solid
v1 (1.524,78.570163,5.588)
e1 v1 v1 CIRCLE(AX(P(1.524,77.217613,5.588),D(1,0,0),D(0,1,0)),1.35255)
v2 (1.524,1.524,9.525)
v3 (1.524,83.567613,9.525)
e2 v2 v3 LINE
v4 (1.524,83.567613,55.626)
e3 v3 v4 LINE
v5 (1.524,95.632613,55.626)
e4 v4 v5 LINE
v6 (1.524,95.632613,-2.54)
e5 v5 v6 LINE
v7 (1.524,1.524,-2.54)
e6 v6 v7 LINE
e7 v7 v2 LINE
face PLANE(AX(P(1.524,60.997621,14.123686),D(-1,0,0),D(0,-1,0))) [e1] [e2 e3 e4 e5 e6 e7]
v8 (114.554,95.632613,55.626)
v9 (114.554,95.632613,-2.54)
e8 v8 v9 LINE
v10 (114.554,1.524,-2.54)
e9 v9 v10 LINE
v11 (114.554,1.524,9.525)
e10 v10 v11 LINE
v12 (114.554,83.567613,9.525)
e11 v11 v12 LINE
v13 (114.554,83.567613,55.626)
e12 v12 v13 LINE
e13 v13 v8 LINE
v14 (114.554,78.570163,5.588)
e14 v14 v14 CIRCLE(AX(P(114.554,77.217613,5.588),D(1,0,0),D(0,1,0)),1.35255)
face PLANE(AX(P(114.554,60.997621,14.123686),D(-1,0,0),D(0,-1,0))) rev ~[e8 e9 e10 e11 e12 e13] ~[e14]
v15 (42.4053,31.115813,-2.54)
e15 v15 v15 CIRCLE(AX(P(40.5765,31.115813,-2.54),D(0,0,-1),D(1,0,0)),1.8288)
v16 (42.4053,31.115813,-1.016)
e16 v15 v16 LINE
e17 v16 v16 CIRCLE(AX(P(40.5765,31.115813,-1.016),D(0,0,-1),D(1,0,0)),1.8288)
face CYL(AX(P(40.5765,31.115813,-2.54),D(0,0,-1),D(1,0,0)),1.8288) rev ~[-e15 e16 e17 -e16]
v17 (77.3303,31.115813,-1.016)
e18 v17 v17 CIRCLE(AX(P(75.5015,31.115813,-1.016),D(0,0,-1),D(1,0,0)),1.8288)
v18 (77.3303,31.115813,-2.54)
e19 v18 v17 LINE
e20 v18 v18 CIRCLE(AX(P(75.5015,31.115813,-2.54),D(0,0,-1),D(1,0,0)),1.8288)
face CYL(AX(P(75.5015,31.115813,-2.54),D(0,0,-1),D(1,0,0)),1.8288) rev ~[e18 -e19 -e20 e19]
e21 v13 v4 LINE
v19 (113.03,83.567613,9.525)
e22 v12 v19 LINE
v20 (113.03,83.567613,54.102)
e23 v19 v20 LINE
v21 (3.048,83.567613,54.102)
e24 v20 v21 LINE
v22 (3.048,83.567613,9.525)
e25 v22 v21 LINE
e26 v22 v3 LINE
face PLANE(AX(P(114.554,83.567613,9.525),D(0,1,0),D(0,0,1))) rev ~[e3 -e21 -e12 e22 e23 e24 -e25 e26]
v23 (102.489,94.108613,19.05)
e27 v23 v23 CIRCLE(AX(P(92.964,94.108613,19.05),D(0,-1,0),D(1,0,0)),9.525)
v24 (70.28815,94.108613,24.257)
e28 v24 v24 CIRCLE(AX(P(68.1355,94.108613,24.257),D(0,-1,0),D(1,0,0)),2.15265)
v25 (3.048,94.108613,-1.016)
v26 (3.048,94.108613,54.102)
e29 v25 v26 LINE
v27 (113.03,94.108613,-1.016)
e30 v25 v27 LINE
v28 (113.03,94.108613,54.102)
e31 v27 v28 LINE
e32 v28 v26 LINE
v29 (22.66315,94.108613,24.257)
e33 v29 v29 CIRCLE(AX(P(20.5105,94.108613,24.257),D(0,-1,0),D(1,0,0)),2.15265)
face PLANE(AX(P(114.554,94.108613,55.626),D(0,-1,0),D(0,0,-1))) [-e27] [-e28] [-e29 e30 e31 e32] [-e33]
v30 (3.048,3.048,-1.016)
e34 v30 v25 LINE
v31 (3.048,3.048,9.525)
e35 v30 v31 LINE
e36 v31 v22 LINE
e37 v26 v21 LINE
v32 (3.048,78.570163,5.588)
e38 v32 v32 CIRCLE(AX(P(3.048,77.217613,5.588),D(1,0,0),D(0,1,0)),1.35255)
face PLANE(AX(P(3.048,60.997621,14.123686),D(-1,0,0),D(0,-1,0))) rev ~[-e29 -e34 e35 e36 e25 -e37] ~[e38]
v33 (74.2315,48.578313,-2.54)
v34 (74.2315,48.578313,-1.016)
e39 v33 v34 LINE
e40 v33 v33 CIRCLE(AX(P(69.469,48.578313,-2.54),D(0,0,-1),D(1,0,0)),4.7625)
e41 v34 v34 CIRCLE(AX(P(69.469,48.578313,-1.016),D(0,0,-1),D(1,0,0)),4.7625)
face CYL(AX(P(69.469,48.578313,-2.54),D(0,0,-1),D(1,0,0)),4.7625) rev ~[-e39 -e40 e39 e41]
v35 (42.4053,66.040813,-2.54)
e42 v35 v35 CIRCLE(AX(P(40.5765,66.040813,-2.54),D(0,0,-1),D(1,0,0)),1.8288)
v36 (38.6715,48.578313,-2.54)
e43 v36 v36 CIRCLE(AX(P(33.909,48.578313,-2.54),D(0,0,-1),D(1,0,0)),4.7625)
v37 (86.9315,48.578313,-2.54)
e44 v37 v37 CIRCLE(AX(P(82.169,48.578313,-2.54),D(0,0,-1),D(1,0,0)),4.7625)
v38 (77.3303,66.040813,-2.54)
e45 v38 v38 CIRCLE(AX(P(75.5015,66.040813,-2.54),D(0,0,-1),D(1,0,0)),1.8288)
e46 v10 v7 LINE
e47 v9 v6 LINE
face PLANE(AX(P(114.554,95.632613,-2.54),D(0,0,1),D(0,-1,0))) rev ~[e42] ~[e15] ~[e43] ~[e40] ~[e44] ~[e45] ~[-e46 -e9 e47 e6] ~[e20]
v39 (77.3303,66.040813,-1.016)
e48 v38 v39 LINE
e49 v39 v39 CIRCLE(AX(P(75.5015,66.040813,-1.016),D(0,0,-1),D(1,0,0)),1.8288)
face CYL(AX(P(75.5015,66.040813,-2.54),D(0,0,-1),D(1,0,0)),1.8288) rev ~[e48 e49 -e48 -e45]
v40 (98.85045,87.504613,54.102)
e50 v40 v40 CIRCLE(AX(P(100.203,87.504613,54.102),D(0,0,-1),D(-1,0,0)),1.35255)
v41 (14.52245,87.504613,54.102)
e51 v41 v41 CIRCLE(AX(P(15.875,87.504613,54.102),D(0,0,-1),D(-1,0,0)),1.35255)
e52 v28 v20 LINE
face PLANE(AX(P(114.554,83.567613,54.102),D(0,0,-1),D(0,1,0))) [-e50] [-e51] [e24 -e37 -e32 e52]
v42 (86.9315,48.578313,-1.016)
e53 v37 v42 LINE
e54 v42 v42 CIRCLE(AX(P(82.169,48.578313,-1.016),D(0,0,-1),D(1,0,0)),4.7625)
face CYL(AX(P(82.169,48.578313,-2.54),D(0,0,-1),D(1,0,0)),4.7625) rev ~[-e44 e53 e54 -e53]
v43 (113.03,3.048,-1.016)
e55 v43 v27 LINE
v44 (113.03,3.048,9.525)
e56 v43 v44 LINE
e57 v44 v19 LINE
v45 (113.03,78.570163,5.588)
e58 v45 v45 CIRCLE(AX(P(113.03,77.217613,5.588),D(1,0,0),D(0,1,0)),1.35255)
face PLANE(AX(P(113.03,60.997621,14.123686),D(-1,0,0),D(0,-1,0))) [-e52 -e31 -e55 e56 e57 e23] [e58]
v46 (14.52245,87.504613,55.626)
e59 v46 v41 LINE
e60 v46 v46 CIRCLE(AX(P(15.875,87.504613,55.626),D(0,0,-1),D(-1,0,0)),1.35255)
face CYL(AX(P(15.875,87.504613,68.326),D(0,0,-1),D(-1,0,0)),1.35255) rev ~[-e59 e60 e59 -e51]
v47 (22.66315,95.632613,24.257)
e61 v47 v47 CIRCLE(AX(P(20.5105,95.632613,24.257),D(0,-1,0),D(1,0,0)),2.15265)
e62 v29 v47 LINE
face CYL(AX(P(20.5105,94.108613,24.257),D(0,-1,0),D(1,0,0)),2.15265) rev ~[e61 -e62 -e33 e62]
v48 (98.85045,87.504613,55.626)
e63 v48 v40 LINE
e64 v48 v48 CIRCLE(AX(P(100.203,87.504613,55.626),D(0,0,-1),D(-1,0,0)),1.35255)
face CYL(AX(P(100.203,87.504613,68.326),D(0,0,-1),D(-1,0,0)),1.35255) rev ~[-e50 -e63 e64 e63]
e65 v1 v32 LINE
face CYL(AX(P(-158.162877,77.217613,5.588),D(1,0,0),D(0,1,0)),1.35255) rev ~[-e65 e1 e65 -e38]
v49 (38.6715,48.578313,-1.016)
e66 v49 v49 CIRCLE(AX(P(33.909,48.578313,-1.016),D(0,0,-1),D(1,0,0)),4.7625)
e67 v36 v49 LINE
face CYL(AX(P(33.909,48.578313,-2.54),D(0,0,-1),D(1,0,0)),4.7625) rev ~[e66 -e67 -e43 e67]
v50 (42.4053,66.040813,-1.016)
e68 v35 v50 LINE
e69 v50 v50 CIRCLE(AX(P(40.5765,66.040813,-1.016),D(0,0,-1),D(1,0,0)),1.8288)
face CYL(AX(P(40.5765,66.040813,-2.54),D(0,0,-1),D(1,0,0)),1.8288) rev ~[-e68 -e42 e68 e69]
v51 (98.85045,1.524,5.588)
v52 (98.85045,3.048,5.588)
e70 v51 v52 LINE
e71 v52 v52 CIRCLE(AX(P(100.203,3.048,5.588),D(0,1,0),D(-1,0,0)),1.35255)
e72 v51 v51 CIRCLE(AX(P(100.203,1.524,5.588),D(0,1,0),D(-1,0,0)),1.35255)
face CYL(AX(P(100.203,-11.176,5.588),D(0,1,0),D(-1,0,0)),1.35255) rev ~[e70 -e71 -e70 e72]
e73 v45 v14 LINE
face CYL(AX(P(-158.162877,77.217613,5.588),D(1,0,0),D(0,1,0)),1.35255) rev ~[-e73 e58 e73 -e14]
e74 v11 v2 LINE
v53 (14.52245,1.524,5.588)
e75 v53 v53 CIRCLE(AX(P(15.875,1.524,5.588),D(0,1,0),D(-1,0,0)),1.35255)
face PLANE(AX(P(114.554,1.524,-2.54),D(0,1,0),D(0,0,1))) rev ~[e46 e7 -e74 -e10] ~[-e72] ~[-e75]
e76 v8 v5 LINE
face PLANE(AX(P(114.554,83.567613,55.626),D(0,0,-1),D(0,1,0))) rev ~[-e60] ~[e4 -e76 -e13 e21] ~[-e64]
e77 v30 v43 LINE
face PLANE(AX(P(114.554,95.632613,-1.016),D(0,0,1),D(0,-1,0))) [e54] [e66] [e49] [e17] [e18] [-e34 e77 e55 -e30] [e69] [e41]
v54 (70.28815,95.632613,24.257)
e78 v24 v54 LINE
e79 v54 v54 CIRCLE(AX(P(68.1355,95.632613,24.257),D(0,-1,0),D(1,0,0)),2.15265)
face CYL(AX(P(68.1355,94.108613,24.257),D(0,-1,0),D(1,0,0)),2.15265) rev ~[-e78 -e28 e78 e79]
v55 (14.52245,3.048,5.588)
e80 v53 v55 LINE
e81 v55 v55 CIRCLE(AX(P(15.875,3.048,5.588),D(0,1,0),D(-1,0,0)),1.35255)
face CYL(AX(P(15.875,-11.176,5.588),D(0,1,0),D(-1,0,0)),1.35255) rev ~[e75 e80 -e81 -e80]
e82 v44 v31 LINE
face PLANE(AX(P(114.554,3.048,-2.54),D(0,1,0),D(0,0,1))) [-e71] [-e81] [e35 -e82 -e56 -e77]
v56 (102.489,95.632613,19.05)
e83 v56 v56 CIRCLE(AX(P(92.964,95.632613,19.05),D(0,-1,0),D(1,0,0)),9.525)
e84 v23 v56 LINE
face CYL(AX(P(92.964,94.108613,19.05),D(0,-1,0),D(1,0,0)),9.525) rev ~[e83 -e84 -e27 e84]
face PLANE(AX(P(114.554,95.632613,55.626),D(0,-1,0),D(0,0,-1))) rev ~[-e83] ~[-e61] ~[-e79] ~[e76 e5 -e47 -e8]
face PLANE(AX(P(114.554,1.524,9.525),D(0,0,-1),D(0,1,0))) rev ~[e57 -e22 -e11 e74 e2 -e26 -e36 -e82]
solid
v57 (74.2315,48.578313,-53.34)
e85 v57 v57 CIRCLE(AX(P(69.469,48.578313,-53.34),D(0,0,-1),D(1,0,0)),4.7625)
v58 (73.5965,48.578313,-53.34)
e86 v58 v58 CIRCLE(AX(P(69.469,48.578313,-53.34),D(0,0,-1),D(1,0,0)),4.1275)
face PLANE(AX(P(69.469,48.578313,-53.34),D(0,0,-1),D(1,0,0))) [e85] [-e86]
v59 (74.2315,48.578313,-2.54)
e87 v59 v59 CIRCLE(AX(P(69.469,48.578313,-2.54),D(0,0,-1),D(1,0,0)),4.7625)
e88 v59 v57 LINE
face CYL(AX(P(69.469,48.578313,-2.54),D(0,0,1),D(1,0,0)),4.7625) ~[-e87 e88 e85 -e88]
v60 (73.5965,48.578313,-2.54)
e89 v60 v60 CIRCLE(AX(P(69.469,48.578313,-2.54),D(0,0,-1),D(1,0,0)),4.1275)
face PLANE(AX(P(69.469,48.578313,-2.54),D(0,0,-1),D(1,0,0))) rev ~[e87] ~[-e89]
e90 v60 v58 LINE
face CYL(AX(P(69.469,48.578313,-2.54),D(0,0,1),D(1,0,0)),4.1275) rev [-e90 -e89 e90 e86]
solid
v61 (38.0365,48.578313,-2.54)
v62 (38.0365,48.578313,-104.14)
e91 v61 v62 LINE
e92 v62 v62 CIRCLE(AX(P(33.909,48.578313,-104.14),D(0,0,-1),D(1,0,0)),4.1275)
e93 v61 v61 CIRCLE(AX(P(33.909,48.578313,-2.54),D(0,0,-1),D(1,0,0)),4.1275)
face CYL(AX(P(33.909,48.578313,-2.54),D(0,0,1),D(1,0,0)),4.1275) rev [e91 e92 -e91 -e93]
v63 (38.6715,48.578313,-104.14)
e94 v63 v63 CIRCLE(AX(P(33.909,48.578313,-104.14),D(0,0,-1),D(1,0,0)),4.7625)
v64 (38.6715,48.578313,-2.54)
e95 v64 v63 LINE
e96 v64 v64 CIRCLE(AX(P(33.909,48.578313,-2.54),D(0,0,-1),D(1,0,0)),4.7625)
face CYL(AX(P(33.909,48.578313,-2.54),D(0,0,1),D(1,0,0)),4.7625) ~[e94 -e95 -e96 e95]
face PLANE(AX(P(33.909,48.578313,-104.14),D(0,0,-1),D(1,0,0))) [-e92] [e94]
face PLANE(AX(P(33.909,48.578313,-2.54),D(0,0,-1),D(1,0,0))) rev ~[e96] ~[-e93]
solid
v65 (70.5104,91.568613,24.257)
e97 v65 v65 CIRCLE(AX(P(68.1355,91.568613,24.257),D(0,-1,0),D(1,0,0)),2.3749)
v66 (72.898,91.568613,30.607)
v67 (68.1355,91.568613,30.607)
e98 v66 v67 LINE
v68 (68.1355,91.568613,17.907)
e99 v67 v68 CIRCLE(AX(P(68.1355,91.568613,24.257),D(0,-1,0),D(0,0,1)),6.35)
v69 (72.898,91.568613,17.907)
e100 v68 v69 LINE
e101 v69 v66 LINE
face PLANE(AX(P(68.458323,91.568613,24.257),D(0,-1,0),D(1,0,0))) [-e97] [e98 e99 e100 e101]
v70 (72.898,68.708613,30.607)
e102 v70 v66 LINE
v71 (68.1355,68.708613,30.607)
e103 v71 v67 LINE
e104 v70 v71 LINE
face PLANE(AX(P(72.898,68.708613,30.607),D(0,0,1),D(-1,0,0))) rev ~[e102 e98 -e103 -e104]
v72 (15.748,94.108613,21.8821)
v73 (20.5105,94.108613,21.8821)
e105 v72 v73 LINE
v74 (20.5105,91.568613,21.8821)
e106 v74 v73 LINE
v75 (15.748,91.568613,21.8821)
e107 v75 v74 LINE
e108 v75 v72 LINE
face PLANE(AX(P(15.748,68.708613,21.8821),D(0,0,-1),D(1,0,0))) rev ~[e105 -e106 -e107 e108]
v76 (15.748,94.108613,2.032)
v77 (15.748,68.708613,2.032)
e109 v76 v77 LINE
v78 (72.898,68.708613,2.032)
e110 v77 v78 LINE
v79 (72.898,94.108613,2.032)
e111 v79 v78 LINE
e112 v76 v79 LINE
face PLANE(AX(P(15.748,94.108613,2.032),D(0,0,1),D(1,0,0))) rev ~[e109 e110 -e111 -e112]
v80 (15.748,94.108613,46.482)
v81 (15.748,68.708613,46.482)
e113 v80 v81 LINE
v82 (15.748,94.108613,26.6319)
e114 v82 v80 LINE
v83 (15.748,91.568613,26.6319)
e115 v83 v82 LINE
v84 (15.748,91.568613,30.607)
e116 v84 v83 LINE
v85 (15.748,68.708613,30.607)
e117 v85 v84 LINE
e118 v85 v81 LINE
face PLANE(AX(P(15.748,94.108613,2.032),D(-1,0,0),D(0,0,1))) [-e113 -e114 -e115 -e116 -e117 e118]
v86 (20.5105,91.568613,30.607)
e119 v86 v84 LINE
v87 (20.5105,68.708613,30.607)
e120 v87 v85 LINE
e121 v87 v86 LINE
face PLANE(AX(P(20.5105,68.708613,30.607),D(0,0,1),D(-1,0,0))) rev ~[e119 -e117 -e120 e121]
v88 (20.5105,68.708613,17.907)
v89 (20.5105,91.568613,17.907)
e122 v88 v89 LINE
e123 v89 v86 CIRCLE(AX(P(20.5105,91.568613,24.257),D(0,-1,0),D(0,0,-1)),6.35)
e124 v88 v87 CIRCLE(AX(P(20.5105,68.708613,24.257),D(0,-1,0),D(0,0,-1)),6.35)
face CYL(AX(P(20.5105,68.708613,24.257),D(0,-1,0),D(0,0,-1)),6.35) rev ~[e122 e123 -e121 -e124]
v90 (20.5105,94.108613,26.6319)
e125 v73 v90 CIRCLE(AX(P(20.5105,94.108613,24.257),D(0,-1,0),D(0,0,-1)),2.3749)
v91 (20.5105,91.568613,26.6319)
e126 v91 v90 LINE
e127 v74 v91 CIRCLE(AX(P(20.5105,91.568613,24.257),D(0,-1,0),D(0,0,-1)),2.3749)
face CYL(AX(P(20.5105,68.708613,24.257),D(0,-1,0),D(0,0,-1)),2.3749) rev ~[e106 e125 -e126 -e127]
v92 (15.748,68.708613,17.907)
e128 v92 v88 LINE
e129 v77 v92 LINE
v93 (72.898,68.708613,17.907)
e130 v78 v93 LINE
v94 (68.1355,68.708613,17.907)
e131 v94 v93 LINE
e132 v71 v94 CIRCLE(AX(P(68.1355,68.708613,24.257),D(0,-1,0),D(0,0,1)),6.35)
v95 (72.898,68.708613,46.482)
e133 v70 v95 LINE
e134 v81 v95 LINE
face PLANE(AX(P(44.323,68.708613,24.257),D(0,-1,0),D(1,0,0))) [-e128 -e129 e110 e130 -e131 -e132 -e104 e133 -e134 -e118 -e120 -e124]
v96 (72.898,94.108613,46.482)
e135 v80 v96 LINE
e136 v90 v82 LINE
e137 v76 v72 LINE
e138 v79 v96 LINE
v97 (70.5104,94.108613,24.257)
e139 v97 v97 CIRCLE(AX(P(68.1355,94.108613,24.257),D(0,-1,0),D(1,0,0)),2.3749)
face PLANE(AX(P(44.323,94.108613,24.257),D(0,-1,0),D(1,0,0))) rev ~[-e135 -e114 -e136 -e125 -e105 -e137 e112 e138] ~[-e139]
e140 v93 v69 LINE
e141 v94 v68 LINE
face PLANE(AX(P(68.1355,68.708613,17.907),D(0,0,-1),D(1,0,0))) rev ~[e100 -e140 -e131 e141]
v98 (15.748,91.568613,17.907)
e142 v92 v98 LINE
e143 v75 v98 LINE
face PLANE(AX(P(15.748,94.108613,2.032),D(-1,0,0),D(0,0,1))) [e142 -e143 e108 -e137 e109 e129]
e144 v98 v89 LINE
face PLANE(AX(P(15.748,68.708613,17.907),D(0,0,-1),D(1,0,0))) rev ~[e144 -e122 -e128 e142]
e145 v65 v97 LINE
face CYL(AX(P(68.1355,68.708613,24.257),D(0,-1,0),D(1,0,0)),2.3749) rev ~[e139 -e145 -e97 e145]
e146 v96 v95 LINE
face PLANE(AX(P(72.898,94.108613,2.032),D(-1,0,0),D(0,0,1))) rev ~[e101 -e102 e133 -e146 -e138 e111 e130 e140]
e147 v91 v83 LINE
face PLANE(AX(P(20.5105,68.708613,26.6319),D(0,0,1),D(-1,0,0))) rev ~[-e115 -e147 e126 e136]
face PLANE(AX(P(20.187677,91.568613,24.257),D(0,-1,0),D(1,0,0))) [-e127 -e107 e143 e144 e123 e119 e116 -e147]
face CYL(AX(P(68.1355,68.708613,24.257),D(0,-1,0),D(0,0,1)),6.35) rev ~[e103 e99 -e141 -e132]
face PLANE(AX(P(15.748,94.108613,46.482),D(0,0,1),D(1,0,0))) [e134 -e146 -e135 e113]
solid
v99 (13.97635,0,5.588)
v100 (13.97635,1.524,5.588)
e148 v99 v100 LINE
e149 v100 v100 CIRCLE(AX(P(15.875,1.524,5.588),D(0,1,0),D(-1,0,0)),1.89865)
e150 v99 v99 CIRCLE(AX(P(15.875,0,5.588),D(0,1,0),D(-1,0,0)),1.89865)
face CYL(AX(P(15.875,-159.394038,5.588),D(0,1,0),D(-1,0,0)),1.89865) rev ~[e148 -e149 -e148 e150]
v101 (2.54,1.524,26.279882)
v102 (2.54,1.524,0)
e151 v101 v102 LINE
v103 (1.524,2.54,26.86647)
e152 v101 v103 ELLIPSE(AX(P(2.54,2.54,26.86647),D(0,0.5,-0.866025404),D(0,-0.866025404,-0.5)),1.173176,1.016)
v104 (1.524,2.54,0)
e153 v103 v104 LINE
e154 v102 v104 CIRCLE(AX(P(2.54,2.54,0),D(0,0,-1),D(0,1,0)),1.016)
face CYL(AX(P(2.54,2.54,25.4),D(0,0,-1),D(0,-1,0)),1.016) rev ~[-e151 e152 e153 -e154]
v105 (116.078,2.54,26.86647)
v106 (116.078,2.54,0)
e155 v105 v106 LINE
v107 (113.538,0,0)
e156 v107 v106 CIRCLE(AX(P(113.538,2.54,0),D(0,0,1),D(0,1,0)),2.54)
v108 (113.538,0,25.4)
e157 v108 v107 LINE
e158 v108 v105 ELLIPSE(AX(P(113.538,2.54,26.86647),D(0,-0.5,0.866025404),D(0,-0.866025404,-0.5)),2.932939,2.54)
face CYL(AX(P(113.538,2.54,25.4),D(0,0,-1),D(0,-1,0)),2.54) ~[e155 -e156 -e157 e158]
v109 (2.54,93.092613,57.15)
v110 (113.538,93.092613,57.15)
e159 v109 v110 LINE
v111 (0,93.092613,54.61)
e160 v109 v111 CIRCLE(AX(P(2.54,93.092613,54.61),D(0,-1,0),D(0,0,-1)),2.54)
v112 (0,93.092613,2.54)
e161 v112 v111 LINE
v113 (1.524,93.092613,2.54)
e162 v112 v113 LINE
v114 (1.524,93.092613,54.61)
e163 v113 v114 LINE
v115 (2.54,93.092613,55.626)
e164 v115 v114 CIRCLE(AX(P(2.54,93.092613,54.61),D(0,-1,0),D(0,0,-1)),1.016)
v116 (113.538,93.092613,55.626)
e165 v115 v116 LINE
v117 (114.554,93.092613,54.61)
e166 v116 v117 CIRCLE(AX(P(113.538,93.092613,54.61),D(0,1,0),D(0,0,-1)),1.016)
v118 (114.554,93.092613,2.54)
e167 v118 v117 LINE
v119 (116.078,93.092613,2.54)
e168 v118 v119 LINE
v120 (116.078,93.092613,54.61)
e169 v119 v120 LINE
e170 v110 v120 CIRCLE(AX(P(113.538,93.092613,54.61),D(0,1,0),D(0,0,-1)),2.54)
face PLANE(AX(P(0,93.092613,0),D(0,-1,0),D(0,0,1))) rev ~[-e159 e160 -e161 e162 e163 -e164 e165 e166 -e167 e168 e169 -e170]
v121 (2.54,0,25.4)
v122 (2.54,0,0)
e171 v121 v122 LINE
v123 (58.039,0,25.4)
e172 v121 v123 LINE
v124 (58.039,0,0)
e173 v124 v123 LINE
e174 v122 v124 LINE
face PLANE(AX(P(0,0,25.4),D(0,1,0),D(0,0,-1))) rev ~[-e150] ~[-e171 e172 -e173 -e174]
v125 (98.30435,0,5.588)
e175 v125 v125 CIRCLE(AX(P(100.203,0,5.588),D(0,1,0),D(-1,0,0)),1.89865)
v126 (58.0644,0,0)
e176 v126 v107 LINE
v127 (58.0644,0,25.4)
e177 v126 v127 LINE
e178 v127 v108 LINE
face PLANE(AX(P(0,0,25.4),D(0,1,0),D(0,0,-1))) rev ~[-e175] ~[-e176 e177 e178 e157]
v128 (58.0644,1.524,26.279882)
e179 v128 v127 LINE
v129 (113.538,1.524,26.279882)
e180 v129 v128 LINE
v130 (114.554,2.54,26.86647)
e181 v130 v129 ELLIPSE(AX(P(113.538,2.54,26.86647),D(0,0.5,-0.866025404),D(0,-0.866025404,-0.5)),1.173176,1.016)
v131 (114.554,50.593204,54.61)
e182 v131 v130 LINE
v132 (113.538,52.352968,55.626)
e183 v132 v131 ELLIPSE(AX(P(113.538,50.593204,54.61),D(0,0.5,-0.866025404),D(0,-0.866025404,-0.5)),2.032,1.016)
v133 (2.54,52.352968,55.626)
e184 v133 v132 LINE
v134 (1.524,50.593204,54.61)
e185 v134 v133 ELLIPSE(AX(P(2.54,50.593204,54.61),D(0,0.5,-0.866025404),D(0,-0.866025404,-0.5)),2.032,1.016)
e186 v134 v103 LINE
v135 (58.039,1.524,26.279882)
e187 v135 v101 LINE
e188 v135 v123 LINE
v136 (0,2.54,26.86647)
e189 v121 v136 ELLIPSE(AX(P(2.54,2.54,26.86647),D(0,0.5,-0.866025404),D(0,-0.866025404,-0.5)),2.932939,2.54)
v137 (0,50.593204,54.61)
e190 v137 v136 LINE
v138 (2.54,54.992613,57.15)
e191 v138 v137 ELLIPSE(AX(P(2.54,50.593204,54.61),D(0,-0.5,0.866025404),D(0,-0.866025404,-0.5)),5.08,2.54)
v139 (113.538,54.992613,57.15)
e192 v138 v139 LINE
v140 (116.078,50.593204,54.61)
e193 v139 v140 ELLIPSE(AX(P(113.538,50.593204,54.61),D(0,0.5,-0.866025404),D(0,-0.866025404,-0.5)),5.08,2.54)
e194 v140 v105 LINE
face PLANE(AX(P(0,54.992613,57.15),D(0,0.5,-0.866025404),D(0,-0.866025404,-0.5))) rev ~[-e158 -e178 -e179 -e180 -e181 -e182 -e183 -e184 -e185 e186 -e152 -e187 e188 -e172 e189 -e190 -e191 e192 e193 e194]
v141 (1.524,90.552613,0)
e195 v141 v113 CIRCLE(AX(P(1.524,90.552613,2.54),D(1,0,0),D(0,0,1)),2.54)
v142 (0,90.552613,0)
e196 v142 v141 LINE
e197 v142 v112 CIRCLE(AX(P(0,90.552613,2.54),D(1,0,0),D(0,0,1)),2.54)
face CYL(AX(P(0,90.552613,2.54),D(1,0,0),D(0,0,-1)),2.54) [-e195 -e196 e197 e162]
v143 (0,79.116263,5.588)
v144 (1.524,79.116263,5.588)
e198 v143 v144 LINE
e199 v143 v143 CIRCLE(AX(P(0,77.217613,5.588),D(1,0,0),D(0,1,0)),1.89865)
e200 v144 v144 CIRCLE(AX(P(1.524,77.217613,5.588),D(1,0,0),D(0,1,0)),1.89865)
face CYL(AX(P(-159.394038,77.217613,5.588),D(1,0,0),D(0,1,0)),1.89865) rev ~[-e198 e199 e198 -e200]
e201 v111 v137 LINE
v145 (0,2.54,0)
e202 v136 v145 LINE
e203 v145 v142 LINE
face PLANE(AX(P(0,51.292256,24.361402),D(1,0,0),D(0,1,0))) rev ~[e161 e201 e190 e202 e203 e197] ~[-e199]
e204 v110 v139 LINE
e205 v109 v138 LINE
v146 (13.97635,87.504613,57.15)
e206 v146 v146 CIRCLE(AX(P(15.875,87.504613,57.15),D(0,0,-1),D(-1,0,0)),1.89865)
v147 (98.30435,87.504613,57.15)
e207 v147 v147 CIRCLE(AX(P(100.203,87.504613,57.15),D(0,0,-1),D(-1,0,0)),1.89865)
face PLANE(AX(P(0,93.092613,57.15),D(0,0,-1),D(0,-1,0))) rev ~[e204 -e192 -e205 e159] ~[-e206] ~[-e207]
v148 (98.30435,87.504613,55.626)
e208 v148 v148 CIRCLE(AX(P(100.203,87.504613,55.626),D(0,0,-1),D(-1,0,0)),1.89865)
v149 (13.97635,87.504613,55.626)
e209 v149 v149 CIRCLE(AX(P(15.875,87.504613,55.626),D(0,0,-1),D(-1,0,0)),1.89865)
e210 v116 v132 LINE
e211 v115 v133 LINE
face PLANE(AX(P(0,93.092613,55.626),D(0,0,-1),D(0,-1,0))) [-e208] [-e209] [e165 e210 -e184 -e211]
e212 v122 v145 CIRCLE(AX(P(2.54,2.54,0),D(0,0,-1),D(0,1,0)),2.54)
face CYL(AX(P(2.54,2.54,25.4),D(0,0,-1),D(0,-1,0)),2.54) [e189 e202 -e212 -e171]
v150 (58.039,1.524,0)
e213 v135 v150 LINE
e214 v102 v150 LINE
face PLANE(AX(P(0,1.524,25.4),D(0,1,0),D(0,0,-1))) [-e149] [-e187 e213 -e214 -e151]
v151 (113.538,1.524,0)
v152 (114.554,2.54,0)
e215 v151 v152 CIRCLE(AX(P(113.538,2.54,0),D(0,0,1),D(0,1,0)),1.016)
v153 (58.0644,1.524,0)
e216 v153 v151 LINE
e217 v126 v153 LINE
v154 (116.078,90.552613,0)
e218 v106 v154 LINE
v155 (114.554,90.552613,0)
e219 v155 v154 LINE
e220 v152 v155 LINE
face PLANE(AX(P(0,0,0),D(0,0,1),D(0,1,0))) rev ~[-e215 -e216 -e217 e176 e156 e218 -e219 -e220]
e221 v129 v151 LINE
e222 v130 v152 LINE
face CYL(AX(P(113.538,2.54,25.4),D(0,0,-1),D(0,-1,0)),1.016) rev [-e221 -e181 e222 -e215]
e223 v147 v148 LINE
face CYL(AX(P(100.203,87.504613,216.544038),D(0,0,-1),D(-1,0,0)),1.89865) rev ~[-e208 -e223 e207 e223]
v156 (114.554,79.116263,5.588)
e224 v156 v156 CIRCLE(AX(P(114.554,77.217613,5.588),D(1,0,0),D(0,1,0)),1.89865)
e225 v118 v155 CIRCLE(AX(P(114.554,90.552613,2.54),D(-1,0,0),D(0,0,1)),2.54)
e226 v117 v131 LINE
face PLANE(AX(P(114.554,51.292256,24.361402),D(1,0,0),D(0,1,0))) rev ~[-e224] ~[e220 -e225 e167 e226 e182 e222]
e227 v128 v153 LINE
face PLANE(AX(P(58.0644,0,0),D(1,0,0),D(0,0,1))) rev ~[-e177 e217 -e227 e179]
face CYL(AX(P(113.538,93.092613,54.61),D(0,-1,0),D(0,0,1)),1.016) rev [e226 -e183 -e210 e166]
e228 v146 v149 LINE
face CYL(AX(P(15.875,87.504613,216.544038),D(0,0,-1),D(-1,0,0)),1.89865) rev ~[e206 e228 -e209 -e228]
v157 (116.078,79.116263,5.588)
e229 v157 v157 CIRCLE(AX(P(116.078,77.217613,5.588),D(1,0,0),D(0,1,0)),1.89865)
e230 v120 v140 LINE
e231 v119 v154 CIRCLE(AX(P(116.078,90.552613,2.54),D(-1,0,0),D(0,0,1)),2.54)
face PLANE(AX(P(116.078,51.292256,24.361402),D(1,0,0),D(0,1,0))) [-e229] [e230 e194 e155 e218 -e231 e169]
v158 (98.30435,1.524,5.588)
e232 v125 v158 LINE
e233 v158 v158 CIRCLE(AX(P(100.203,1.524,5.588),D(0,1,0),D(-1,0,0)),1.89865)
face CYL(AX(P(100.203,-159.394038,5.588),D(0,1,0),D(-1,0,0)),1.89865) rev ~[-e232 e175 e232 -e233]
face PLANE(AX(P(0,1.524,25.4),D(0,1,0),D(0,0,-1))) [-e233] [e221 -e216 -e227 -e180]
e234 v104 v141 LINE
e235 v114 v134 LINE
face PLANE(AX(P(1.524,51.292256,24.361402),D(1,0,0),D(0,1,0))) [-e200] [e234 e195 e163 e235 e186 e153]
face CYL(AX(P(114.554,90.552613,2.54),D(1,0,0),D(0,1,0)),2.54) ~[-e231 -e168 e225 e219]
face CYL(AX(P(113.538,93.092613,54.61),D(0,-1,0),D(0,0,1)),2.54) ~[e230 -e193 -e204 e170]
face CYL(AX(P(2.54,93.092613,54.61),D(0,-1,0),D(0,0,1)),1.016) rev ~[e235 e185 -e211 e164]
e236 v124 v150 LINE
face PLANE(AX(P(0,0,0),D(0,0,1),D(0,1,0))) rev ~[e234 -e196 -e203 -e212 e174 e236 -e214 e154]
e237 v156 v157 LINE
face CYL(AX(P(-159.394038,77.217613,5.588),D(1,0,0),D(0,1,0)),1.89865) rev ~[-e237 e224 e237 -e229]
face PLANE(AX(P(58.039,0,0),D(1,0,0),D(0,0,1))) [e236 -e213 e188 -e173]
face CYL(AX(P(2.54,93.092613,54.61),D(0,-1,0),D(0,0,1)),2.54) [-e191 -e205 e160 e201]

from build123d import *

# Parameters (mm, degrees)
F1_DEPTH         = 116.078
F2_R             = 2.54
F3_T             = -1.524
F5_DEPTH         = 113.03
F6_T             = -1.524
F7_W             = 57.15
F7_H             = 44.45
F8_DEPTH         = 25.4
F10_DEPTH        = 22.86
F11_R            = 2.3749
F12_DEPTH        = 26.925
F13_R            = 4.7625
F14_DEPTH        = 1.524
F15_R            = 4.7625
F15_R_2          = 4.1275
F16_DEPTH        = 50.8
F17_DEPTH        = 101.6
F18_R            = 1.8288
F19_DEPTH        = 59.691
F20_R            = 2.15265
F21_DEPTH        = 1.525
F22_R            = 9.525
F23_DEPTH        = 1.525
F27_D            = 3.7973
F27_ON_F25_D     = 3.7973
F27_ON_F24_D     = 3.7973
F28_D            = 2.7051
F29_D            = 2.7051
F29_DEPTH        = 12.7
F29_START        = 1.524
F29_TIP          = 0.8126940303
F29_ON_F25_D     = 2.7051
F29_ON_F25_DEPTH = 12.7
F29_ON_F25_START = 1.524
F29_ON_F25_TIP   = 0.8126940303
F30_W            = 0.0254
F30_H            = 69.686152041
F31_DEPTH        = 25.4
F32_R            = 2.54


with BuildPart() as f1:
    # F0 (on Right) → F1 (new body)
    with BuildSketch(Plane.YZ):
        Polygon((0, 25.4), (0, 0), (93.0926131403, 0), (93.0926131403, 57.15), (54.9926131403, 57.15), align=None)
    extrude(amount=F1_DEPTH)

    # F2
    f2_edges = [f1.edges().sort_by_distance(p)[0] for p in [
        (116.078, 74.042613, 57.15),
        (116.078, 0, 12.7),
        (0, 0, 12.7),
        (0, 74.042613, 57.15),
    ]]
    fillet(f2_edges, radius=F2_R)

    # F3
    f3_openings = [f1.faces().sort_by_distance(p)[0] for p in [
        (58.039, 93.092613, 28.563304),
        (58.039, 46.558092, 0),
        (58.039, 27.488057, 41.270237),
    ]]
    offset(amount=F3_T, openings=f3_openings)

    # F27 (through all)
    with Locations(Plane.XY.offset(57.15)):
        with Locations((100.203, 87.5046131403), (15.875, 87.5046131403)):
            Hole(F27_D / 2)

    # F27 on F25 (through all)
    with Locations(Plane.XZ):
        with Locations((15.875, 5.588), (100.203, 5.588)):
            Hole(F27_ON_F25_D / 2)

    # F27 on F24 (through all)
    with Locations(Plane(origin=(0, 0, 0), x_dir=(0, -1, 0), z_dir=(-1, 0, 0))):
        with Locations((-77.2176131403, 5.588)):
            Hole(F27_ON_F24_D / 2)

    # F30 (on face) → F31 (cut)
    with BuildSketch(Plane.XZ):
        with Locations((58.0517, 34.8430760205)):
            Rectangle(F30_W, F30_H)
    extrude(amount=-F31_DEPTH, mode=Mode.SUBTRACT)

    # F32
    f32_edges = [f1.edges().sort_by_distance(p)[0] for p in [
        (0.762, 93.092613, 0),
        (115.316, 93.092613, 0),
    ]]
    fillet(f32_edges, radius=F32_R)


with BuildPart() as f5:
    # F4 (on face) → F5 (new body, through all)
    with BuildSketch(Plane(origin=(114.554, 0, 0), x_dir=(0, -1, 0), z_dir=(-1, 0, 0))):
        Polygon((-1.524, 9.525), (-83.5676131403, 9.525), (-83.5676131403, 55.626), (-93.0926131403, 55.626), (-95.6326131403, 55.626), (-95.6326131403, -2.54), (-1.524, -2.54), (-1.524, 0), align=None)
    extrude(amount=F5_DEPTH)

    # F6
    f6_openings = [f5.faces().sort_by_distance(p)[0] for p in [
        (58.039, 83.567613, 32.5755),
        (58.039, 42.545807, 9.525),
    ]]
    offset(amount=F6_T, openings=f6_openings)

    # F13 (on face) → F14 (cut, through all)
    with BuildSketch(Plane(origin=(0, 0, -2.54), x_dir=(1, 0, 0), z_dir=(0, 0, -1))):
        with Locations((82.169, -48.5783125154)):
            Circle(F13_R)
        with Locations((69.469, -48.5783125154)):
            Circle(F13_R)
        with Locations((33.909, -48.5783125154)):
            Circle(F13_R)
    extrude(amount=-F14_DEPTH, mode=Mode.SUBTRACT)

    # F18 (on face) → F19 (cut, through all)
    with BuildSketch(Plane(origin=(0, 0, -2.54), x_dir=(1, 0, 0), z_dir=(0, 0, -1))):
        with Locations((40.5765, -31.1158125154)):
            Circle(F18_R)
        with Locations((75.5015, -31.1158125154)):
            Circle(F18_R)
        with Locations((75.5015, -66.0408125154)):
            Circle(F18_R)
        with Locations((40.5765, -66.0408125154)):
            Circle(F18_R)
    extrude(amount=-F19_DEPTH, mode=Mode.SUBTRACT)

    # F20 (on face) → F21 (cut, through all)
    with BuildSketch(Plane.XZ.offset(-94.1086131403)):
        with Locations((20.5105, 24.257)):
            Circle(F20_R)
        with Locations((68.1355, 24.257)):
            Circle(F20_R)
    extrude(amount=-F21_DEPTH, mode=Mode.SUBTRACT)

    # F22 (on face) → F23 (cut, through all)
    with BuildSketch(Plane.XZ.offset(-94.1086131403)):
        with Locations((92.964, 19.05)):
            Circle(F22_R)
    extrude(amount=-F23_DEPTH, mode=Mode.SUBTRACT)

    # F28 (through all)
    with Locations(Plane(origin=(0, 0, 0), x_dir=(0, -1, 0), z_dir=(-1, 0, 0))):
        with Locations((-77.2176131403, 5.588)):
            Hole(F28_D / 2)

    # F29
    # its depths count from where the whole tool has entered the part; down to there all is cleared
    with Locations(Plane.XY.offset(57.15).offset(-F29_START)):
        with Locations((15.875, 87.5046131403), (100.203, 87.5046131403)):
            Hole(F29_D / 2, depth=F29_DEPTH)
            with Locations((0, 0, -(F29_DEPTH + F29_TIP / 2))):  # 118° drill point
                Cone(0, F29_D / 2, F29_TIP, mode=Mode.SUBTRACT)

    # F29 on F25
    # its depths count from where the whole tool has entered the part; down to there all is cleared
    with Locations(Plane.XZ.offset(-F29_ON_F25_START)):
        with Locations((100.203, 5.588), (15.875, 5.588)):
            Hole(F29_ON_F25_D / 2, depth=F29_ON_F25_DEPTH)
            with Locations((0, 0, -(F29_ON_F25_DEPTH + F29_ON_F25_TIP / 2))):  # 118° drill point
                Cone(0, F29_ON_F25_D / 2, F29_ON_F25_TIP, mode=Mode.SUBTRACT)


with BuildPart() as f8:
    # F7 (on face) → F8 (new body)
    with BuildSketch(Plane.XZ.offset(-94.1086131403)):
        with Locations((44.323, 24.257)):
            Rectangle(F7_W, F7_H)
    extrude(amount=F8_DEPTH)

    # F9 (on face) → F10 (cut)
    with BuildSketch(Plane.XZ.offset(-68.7086131403)):
        with BuildLine():
            Line((72.898, 30.607), (68.1355, 30.607))
            ThreePointArc((68.1355, 30.607), (61.7855, 24.257), (68.1355, 17.907))
            Line((68.1355, 17.907), (72.898, 17.907))
            Line((72.898, 17.907), (72.898, 30.607))
        make_face()
        with BuildLine():
            ThreePointArc((20.5105, 17.907), (26.8605, 24.257), (20.5105, 30.607))
            Line((20.5105, 30.607), (15.748, 30.607))
            Line((15.748, 30.607), (15.748, 17.907))
            Line((15.748, 17.907), (20.5105, 17.907))
        make_face()
    extrude(amount=-F10_DEPTH, mode=Mode.SUBTRACT)

    # F11 (on face) → F12 (cut, through all)
    with BuildSketch(Plane.XZ.offset(-68.7086131403)):
        with BuildLine():
            Line((15.748, 21.8821), (20.5105, 21.8821))
            ThreePointArc((20.5105, 21.8821), (22.8854, 24.257), (20.5105, 26.6319))
            Line((20.5105, 26.6319), (15.748, 26.6319))
            Line((15.748, 26.6319), (15.748, 21.8821))
        make_face()
        with Locations((68.1355, 24.257)):
            Circle(F11_R)
    extrude(amount=-F12_DEPTH, mode=Mode.SUBTRACT)


with BuildPart() as f16:
    # F15 (on face) → F16 (new body)
    with BuildSketch(Plane(origin=(0, 0, -2.54), x_dir=(1, 0, 0), z_dir=(0, 0, -1))):
        with Locations((69.469, -48.5783125154)):
            Circle(F15_R)
        with Locations((69.469, -48.5783125154)):
            Circle(F15_R_2, mode=Mode.SUBTRACT)
    extrude(amount=F16_DEPTH)


with BuildPart() as f17:
    # F15 (on face) → F17 (new body)
    with BuildSketch(Plane(origin=(0, 0, -2.54), x_dir=(1, 0, 0), z_dir=(0, 0, -1))):
        with Locations((33.909, -48.5783125154)):
            Circle(F15_R)
        with Locations((33.909, -48.5783125154)):
            Circle(F15_R_2, mode=Mode.SUBTRACT)
    extrude(amount=F17_DEPTH)


solid = Compound([f1.part, f5.part, f8.part, f16.part, f17.part])
